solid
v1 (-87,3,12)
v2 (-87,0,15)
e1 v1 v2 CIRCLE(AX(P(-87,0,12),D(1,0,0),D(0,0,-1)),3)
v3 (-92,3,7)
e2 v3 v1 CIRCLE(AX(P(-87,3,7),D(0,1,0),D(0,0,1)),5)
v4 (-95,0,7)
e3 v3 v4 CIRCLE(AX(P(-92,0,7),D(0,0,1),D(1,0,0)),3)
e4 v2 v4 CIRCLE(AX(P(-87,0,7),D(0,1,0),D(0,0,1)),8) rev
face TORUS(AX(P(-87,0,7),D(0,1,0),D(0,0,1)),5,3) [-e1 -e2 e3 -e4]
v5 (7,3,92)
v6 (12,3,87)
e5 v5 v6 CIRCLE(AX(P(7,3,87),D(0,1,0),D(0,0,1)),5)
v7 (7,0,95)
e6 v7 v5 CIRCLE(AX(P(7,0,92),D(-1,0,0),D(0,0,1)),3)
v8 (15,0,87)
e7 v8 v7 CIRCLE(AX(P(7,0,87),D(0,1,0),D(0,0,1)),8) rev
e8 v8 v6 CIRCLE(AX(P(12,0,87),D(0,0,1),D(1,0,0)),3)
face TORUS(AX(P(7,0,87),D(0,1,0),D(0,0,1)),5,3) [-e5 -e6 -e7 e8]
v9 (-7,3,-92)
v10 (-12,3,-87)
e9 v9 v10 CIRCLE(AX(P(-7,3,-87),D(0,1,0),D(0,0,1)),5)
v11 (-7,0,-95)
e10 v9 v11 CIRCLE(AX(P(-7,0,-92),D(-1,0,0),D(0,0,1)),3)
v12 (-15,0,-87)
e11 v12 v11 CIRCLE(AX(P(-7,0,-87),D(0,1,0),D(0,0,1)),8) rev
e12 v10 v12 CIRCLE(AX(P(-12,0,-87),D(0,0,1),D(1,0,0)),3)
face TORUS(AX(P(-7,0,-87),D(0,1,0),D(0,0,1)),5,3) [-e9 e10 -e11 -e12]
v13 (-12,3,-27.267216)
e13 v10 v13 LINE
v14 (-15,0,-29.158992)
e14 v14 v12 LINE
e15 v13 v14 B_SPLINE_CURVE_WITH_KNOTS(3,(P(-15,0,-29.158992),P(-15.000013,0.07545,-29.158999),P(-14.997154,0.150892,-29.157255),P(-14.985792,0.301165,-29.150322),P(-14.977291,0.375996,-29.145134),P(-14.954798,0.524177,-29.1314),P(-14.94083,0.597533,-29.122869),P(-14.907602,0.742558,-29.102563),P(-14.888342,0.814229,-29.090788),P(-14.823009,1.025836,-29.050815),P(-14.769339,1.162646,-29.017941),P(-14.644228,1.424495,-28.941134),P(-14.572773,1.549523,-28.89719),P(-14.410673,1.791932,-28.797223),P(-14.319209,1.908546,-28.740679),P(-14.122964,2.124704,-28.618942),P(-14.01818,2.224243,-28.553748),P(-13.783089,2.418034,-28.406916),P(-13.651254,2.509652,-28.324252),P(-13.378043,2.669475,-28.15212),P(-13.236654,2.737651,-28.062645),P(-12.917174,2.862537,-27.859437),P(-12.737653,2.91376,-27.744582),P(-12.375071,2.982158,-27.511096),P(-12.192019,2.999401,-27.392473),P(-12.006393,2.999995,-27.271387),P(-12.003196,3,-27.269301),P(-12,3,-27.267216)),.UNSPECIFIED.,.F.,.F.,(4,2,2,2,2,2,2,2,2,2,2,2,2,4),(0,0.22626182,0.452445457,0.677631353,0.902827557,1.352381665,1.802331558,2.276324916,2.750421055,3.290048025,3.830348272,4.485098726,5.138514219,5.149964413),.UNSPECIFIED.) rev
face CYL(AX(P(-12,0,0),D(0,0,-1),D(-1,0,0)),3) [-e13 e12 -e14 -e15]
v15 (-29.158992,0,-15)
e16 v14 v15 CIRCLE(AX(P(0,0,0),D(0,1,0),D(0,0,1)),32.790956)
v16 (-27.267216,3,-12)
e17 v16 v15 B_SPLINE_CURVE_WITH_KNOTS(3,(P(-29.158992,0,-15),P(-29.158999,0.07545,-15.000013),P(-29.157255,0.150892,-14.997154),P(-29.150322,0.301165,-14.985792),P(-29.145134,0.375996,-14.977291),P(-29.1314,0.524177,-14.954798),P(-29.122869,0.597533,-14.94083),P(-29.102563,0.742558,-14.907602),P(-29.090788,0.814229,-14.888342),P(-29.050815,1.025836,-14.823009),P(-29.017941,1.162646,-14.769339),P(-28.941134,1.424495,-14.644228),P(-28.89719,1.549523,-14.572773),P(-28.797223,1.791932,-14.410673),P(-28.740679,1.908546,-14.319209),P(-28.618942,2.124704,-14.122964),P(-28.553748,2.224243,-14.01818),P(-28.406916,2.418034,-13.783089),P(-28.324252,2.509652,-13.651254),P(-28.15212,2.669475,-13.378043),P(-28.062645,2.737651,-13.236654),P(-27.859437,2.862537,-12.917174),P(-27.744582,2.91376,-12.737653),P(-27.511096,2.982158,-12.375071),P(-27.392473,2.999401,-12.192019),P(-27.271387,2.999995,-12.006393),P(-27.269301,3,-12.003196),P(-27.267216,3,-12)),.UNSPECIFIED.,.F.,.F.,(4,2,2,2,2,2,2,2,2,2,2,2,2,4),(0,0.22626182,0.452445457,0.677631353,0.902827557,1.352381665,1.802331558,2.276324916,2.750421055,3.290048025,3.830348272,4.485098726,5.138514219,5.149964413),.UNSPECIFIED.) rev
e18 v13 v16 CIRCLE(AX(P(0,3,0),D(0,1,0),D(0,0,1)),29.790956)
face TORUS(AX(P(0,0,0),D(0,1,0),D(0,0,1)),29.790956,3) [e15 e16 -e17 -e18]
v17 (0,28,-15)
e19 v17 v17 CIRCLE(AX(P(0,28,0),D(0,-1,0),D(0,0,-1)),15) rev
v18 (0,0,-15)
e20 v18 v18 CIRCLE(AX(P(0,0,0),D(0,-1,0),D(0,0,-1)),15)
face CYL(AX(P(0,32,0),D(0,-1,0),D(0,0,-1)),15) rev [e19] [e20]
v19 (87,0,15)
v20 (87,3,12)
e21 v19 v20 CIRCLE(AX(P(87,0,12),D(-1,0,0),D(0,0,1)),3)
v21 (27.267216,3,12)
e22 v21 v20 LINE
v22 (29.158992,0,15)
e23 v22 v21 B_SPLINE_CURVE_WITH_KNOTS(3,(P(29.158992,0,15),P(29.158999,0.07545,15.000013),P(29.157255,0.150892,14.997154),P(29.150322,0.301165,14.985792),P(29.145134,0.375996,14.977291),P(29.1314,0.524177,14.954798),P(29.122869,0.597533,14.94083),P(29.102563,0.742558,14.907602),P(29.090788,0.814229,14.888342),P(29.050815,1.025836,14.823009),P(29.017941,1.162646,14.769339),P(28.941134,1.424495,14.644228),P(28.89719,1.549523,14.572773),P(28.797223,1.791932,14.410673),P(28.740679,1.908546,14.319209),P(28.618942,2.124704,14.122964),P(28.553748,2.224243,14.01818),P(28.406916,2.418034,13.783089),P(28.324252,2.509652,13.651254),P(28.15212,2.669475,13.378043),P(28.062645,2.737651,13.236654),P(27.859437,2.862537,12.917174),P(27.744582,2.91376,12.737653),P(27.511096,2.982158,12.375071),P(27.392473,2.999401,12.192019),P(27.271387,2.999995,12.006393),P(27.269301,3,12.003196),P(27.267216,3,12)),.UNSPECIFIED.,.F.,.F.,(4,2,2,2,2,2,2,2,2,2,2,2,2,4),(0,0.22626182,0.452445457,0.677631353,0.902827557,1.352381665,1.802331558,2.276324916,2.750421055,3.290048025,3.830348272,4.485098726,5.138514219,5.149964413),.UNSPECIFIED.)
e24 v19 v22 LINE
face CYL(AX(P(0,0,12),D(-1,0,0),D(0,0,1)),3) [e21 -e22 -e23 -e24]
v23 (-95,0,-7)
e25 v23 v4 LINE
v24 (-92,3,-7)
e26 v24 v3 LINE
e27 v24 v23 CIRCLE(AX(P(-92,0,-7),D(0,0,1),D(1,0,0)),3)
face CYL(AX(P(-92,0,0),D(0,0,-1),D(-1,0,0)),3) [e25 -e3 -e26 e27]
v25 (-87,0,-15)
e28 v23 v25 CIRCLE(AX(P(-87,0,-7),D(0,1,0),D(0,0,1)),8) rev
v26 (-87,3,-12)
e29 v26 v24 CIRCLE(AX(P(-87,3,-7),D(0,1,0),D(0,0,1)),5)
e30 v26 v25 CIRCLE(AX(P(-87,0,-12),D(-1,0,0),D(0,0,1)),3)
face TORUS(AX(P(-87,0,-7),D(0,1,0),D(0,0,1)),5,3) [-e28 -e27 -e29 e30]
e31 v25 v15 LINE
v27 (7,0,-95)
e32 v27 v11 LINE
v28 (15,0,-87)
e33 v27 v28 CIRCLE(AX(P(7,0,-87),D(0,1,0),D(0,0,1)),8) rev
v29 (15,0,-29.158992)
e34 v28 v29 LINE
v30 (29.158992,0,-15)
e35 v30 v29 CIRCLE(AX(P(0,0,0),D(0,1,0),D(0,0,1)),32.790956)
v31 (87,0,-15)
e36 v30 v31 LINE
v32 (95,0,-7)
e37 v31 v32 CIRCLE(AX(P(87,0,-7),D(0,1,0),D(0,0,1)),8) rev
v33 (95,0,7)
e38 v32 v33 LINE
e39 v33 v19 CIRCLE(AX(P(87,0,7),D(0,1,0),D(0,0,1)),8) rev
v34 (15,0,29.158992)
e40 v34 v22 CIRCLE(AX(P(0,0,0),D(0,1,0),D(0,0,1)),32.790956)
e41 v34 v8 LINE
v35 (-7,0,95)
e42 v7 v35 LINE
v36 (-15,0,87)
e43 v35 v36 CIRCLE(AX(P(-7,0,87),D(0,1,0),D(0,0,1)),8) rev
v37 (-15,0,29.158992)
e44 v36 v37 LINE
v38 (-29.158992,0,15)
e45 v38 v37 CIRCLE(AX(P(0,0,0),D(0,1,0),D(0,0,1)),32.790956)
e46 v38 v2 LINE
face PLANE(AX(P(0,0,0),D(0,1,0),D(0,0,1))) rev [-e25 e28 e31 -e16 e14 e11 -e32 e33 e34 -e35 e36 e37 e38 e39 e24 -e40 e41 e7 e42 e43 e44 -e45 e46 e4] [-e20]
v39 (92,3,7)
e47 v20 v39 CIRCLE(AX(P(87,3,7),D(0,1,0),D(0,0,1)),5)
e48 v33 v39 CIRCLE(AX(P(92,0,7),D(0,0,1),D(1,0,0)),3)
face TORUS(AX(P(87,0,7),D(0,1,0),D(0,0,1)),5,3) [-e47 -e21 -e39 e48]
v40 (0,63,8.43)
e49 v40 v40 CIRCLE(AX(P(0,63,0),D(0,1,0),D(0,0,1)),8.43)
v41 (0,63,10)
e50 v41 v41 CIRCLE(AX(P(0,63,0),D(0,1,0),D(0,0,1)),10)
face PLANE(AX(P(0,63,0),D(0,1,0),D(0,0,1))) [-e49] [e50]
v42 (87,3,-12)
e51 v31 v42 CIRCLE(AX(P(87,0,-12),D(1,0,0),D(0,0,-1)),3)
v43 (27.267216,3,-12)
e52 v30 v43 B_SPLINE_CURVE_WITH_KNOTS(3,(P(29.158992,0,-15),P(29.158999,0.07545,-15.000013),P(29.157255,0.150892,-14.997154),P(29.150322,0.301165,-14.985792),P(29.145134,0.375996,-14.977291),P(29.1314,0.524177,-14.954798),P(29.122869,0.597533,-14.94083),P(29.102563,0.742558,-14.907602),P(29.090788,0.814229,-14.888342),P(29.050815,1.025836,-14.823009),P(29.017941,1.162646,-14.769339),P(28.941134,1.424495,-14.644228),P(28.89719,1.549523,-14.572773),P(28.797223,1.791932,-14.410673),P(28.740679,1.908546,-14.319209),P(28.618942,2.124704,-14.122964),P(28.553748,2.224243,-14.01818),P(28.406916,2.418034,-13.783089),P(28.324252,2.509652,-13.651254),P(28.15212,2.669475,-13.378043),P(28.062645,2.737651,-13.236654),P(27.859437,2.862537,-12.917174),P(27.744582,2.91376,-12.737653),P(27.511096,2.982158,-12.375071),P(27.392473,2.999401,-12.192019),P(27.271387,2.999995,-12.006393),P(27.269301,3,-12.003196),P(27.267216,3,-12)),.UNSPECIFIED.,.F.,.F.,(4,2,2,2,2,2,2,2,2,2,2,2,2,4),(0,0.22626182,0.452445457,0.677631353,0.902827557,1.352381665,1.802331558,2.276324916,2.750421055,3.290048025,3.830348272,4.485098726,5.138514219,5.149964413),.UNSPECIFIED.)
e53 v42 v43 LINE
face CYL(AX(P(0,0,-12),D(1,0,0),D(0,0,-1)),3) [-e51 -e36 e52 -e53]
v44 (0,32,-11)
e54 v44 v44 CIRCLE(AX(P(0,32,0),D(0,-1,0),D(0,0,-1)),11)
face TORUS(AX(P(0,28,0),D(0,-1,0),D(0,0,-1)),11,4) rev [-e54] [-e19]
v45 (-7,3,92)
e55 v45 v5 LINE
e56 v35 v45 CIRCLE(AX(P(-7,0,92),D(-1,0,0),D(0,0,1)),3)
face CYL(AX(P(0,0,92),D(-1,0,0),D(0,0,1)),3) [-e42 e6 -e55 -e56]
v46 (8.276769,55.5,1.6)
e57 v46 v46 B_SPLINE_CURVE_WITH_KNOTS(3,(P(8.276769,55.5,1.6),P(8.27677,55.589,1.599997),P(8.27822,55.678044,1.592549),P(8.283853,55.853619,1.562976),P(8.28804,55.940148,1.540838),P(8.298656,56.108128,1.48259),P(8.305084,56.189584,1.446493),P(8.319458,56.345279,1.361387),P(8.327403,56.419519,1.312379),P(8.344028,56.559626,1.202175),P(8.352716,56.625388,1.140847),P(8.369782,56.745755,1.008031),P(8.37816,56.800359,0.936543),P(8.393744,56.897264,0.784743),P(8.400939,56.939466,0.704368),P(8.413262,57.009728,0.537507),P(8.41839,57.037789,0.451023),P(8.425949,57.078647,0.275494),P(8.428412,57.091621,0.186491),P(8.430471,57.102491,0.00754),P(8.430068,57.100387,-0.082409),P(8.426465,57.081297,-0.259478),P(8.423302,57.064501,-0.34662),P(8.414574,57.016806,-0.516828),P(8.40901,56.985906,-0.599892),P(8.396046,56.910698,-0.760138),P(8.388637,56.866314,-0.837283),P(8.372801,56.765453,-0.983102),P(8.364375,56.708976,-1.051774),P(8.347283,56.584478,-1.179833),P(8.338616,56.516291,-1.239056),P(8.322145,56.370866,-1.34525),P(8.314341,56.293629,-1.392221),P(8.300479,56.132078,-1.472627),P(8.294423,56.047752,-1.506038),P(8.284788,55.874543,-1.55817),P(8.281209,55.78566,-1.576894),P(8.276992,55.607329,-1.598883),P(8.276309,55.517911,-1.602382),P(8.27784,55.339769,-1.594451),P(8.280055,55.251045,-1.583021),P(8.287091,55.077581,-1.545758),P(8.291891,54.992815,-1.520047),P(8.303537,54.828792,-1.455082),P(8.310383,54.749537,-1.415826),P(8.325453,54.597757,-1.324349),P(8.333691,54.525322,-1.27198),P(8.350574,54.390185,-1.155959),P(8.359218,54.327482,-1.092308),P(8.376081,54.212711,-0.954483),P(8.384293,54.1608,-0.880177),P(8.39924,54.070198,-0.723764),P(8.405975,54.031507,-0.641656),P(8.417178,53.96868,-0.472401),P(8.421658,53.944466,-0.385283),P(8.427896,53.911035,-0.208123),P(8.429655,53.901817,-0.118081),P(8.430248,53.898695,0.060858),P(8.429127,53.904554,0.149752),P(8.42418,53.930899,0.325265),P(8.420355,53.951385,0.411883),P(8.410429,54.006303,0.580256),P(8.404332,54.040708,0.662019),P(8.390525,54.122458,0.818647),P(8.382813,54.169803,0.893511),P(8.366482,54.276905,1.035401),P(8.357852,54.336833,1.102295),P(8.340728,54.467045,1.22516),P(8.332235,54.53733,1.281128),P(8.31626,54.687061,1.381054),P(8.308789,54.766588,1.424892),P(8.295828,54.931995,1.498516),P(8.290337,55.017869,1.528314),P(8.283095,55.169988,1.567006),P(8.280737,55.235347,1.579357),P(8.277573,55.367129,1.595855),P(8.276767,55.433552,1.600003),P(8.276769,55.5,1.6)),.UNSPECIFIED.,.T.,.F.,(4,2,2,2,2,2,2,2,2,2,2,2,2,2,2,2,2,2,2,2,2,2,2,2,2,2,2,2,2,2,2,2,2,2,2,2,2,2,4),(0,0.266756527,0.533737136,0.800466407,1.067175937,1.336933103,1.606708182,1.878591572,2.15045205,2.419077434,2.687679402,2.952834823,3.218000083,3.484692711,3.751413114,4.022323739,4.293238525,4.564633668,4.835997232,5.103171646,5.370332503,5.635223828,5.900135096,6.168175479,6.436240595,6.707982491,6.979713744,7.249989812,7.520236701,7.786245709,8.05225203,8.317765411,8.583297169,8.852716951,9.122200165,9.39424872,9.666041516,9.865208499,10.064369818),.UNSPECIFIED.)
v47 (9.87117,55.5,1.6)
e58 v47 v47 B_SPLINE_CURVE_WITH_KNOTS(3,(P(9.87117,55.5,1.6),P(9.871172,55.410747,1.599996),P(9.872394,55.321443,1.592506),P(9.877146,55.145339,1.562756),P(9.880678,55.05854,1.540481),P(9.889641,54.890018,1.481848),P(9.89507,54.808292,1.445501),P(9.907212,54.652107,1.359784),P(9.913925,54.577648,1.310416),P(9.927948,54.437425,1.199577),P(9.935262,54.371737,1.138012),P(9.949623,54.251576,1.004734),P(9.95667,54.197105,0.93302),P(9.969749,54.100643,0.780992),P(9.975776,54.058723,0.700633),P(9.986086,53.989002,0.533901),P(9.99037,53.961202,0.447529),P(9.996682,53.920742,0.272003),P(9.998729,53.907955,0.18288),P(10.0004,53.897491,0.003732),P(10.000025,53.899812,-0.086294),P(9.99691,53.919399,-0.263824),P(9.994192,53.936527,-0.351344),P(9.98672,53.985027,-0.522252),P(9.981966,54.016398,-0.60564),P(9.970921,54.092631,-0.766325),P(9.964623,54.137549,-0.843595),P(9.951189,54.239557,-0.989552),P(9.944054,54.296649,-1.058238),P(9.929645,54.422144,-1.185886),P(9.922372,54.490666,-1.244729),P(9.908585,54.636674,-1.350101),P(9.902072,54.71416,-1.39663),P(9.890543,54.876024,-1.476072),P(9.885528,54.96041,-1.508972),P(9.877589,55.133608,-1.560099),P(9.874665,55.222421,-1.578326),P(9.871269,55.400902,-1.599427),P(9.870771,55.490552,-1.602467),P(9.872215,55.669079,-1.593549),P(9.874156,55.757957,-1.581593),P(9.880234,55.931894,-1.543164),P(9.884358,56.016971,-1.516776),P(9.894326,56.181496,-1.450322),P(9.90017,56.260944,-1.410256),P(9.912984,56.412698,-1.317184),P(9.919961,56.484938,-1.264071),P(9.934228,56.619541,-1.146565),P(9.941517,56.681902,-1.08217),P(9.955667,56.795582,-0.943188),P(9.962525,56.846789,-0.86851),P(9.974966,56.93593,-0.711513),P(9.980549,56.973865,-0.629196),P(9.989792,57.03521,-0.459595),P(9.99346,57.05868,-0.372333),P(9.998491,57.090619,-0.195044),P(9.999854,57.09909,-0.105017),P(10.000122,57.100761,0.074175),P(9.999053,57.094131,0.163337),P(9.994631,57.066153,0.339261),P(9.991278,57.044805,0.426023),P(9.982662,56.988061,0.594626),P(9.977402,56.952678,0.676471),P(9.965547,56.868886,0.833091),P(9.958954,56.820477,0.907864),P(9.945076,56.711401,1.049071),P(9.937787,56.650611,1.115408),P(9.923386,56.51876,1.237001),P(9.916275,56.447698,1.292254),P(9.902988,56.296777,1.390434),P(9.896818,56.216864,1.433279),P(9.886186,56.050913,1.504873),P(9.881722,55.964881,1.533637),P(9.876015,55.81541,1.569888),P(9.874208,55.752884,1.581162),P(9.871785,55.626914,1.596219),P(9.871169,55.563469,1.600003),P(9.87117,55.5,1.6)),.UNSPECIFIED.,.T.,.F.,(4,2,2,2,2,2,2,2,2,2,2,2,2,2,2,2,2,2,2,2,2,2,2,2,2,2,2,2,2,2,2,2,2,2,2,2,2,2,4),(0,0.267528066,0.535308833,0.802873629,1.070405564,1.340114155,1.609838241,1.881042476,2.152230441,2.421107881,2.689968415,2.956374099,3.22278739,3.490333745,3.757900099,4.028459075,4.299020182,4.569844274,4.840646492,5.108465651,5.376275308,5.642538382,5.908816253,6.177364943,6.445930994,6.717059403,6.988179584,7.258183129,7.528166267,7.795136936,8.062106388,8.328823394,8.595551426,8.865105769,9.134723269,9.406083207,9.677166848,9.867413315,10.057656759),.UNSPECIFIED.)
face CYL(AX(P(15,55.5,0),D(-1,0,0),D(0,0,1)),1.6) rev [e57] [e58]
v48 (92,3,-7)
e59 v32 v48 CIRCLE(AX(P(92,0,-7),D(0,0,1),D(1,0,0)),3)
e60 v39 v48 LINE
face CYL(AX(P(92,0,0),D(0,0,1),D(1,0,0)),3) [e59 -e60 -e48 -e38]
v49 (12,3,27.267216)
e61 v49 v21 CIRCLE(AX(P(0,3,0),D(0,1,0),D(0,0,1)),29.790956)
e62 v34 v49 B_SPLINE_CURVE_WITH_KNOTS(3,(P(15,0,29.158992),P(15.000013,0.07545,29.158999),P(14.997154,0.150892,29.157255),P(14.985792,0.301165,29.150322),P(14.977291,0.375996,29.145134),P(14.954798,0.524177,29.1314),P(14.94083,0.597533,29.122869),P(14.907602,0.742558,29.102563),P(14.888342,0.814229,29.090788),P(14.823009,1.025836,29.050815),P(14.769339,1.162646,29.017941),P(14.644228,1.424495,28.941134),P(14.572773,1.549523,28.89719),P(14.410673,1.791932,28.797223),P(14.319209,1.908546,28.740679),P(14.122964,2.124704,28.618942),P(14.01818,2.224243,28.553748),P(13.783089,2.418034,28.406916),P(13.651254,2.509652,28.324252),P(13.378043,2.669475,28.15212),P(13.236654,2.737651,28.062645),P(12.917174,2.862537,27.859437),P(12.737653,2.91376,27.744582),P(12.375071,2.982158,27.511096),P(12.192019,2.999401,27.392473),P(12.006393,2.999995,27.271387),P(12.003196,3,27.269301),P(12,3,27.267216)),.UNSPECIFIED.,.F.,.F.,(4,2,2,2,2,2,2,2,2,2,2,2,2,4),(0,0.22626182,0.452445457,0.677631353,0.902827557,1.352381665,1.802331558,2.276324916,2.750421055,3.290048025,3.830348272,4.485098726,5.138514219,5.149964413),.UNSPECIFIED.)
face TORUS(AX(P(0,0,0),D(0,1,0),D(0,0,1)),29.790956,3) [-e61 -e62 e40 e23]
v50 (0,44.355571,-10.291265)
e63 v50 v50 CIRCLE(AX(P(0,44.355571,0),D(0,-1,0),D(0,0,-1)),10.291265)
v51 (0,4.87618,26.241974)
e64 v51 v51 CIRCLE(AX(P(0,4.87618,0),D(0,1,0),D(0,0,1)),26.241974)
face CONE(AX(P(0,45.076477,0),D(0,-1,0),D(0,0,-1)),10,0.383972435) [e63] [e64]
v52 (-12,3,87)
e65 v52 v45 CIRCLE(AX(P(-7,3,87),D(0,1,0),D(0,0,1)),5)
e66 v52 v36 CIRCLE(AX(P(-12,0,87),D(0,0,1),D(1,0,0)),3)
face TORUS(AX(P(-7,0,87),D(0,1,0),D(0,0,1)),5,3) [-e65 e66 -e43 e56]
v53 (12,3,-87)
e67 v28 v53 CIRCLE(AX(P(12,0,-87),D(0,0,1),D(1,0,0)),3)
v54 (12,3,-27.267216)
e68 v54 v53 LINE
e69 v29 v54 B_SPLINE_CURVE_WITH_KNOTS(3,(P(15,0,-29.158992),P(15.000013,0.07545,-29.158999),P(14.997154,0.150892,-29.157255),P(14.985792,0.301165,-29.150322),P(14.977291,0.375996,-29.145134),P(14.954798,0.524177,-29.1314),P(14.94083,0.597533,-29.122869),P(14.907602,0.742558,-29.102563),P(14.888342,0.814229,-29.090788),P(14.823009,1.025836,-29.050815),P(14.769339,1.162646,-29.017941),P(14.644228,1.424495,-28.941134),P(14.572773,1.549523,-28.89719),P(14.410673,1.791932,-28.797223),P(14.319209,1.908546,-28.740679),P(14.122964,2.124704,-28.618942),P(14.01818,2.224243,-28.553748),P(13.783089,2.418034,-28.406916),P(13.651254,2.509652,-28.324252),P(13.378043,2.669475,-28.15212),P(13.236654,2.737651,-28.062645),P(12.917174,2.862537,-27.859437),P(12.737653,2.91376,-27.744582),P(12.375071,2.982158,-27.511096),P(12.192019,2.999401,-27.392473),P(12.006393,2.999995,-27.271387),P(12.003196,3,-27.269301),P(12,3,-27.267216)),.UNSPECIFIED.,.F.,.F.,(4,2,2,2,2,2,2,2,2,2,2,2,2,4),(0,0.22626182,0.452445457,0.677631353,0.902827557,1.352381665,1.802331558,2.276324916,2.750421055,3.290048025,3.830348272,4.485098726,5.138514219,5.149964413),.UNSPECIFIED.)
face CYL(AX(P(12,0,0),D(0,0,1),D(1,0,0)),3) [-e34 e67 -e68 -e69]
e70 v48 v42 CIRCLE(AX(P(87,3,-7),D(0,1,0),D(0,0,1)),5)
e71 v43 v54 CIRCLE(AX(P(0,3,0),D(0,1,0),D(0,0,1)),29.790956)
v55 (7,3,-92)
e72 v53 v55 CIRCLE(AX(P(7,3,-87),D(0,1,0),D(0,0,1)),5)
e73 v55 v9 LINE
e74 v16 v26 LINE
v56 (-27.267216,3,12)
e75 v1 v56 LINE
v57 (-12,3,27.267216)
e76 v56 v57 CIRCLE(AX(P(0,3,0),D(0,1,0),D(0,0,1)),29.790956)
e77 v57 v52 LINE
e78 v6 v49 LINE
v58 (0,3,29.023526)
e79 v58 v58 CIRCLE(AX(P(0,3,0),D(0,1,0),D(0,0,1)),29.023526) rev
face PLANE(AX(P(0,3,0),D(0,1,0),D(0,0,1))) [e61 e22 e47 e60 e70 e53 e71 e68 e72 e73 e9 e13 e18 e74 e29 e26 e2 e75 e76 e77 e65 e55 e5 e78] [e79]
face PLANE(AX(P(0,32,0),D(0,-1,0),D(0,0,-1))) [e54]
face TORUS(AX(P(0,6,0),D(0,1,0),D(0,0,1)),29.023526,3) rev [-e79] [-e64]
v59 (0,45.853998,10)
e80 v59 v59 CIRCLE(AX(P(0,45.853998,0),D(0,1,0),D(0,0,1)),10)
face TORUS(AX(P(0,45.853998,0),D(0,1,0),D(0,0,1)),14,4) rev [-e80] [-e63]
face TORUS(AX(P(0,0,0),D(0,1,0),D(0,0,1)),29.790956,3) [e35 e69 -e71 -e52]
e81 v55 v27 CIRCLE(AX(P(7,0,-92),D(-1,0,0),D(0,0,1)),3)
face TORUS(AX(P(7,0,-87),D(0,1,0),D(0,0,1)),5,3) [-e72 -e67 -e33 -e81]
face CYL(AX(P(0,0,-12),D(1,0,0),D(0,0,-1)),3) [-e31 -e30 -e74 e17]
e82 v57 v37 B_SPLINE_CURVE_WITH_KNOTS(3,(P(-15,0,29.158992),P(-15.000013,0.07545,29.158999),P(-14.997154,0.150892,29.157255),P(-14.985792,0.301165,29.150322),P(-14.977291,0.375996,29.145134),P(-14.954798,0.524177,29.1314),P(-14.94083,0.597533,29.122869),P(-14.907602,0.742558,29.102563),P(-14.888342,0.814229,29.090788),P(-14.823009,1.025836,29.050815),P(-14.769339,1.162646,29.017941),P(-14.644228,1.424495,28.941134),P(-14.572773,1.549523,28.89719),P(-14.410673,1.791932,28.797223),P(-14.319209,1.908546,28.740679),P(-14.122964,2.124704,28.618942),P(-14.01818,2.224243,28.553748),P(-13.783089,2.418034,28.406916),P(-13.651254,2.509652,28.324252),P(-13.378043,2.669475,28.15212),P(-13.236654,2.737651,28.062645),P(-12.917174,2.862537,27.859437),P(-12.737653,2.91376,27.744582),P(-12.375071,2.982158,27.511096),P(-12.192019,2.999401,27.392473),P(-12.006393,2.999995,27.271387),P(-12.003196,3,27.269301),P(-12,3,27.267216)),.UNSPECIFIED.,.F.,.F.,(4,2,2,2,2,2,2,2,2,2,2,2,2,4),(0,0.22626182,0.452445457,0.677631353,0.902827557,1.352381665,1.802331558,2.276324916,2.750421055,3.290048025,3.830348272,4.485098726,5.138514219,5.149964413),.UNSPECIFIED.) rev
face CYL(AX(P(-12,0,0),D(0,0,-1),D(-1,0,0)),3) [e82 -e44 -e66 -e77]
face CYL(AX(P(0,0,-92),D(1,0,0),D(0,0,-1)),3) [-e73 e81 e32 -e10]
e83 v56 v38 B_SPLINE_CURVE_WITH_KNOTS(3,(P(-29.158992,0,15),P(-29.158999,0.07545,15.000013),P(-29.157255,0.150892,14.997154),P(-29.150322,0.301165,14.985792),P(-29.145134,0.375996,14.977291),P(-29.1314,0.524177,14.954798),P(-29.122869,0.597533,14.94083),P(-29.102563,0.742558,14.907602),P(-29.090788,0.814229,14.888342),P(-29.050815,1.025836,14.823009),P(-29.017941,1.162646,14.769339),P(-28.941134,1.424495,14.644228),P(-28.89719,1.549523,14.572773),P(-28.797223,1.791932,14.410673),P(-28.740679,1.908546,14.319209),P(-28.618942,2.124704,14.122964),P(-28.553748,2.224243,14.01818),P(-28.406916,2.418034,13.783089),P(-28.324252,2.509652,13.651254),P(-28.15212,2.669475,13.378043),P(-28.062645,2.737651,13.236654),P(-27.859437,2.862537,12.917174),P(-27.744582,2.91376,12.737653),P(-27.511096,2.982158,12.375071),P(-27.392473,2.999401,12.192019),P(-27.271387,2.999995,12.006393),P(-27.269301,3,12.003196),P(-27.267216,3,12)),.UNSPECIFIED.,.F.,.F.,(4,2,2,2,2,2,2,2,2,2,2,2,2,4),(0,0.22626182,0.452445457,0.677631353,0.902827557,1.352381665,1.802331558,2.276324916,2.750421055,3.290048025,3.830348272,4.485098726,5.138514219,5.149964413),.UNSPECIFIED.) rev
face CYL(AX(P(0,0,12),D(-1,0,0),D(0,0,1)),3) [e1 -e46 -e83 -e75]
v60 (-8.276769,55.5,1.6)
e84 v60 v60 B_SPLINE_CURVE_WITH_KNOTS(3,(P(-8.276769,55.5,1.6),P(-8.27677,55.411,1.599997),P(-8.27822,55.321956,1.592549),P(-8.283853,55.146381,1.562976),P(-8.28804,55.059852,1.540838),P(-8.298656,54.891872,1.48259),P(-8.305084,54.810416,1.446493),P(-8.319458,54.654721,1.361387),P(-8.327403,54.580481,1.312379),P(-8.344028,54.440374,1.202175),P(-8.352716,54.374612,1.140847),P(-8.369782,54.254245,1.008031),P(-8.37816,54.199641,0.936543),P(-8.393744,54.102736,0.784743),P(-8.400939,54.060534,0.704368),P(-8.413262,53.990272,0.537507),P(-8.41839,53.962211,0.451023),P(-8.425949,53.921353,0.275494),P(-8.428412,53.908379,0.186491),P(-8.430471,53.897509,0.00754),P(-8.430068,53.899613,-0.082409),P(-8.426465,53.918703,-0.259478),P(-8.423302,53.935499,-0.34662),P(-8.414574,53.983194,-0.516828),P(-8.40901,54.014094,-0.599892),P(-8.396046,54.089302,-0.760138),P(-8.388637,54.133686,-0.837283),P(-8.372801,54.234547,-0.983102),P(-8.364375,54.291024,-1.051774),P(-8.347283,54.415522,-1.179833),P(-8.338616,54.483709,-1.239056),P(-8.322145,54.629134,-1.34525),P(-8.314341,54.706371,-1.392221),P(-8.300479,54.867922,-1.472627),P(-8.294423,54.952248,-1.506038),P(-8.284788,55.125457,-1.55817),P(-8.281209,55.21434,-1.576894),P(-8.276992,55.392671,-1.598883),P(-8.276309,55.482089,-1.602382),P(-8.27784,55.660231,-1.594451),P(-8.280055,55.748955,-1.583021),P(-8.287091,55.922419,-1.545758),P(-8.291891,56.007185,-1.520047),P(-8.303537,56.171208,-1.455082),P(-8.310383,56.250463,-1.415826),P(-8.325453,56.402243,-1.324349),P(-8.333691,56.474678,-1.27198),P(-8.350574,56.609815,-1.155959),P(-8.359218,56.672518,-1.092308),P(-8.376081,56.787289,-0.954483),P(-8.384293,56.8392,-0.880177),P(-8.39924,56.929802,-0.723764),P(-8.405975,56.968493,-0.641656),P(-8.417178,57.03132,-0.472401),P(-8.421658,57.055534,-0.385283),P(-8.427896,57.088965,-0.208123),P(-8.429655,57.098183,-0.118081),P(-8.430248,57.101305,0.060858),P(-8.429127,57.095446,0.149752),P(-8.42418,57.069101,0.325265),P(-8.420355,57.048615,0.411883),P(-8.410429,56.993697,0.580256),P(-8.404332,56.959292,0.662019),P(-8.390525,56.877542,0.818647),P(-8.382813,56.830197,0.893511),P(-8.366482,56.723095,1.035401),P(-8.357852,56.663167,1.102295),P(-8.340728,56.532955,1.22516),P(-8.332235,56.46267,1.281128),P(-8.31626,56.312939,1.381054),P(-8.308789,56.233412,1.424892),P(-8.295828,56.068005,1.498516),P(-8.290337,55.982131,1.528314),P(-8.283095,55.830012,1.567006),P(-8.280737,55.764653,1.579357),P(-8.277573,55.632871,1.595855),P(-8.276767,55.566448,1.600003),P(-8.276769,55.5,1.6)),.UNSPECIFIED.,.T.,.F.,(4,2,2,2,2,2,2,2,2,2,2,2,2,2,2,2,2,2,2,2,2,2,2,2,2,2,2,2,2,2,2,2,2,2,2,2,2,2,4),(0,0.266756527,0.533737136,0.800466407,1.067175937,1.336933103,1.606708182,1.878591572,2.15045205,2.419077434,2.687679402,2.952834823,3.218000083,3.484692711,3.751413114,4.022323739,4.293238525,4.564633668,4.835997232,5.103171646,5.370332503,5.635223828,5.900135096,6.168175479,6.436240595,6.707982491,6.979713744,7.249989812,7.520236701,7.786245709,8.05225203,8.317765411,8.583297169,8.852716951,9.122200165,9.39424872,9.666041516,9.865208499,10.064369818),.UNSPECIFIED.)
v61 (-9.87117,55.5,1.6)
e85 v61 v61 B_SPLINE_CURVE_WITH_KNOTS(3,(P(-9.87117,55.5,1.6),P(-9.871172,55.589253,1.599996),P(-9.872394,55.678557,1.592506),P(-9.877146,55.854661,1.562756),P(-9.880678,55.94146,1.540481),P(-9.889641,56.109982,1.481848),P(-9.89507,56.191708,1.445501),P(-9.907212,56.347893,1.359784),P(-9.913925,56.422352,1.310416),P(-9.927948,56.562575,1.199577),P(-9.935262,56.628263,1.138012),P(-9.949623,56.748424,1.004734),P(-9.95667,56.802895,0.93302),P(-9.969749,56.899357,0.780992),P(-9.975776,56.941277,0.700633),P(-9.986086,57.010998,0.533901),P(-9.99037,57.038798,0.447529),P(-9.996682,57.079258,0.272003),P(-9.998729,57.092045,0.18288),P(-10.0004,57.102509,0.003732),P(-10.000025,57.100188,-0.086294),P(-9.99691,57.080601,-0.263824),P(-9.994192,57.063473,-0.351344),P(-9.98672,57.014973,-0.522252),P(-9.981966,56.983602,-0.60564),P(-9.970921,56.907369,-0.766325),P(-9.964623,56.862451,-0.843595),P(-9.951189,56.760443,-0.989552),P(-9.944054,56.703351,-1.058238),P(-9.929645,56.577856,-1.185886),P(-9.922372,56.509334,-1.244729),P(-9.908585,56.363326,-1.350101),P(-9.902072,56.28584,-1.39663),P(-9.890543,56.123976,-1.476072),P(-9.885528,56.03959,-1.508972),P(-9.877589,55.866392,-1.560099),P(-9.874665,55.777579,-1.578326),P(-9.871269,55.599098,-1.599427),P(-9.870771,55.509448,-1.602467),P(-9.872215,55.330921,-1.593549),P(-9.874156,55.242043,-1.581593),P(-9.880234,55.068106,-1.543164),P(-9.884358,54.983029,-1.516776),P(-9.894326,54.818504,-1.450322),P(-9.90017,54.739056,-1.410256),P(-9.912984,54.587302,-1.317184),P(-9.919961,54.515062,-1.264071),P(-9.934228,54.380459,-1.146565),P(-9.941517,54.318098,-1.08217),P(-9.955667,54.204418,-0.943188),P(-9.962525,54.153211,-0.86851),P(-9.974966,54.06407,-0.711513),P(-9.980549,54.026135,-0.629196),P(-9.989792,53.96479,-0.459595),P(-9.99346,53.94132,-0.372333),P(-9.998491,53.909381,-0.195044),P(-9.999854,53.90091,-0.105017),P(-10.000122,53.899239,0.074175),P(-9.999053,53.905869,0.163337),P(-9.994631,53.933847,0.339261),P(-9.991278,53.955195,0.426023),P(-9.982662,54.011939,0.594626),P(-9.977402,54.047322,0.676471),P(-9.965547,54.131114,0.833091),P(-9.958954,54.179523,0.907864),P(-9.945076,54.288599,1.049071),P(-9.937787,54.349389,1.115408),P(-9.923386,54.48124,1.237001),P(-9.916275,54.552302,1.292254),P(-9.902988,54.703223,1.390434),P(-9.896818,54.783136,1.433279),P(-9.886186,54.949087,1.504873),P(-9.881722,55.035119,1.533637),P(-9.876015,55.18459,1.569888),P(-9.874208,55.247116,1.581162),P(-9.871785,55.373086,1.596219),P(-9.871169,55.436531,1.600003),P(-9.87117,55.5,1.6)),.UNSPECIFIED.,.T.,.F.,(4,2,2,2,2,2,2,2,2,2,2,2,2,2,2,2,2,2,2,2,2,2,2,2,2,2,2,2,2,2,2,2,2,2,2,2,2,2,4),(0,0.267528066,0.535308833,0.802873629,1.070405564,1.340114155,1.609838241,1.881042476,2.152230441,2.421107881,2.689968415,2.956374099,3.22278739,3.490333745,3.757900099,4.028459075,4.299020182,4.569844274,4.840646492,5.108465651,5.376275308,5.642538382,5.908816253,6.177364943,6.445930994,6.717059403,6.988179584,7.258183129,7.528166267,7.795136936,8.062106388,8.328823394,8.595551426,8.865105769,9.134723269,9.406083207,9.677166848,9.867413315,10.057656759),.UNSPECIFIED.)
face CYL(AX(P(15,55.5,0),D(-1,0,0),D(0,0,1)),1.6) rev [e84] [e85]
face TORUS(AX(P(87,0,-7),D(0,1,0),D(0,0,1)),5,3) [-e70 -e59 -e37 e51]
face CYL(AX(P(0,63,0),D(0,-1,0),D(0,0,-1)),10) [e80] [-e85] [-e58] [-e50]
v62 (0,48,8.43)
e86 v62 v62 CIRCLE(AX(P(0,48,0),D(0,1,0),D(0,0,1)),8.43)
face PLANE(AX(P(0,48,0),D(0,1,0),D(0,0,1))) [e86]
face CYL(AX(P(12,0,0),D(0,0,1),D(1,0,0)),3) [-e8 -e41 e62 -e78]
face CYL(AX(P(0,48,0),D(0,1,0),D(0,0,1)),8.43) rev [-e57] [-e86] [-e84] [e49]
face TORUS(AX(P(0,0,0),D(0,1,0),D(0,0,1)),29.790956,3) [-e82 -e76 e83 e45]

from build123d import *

# Parameters (mm, degrees)
BOSS_EXTRUDE1_DEPTH     = 3
FILLET4_R               = 8
FILLET5_R               = 3
SKETCH4_R               = 10
BOSS_EXTRUDE4_DEPTH     = 60
CHAMFER2_SIZE           = 17
CHAMFER2_SIZE2          = 42.076476508
FILLET7_R               = 4
SKETCH5_R               = 15
CUT_EXTRUDE1_DEPTH      = 32
FILLET8_R               = 3
SKETCH6_R               = 8.43
CUT_EXTRUDE2_DEPTH      = 15
FILLET9_R               = 4
CUT_EXTRUDE3_DEPTH      = 15
CUT_EXTRUDE3_DEPTH_BACK = 15


with BuildPart() as part:
    # Sketch1 → Boss-Extrude1 (new body)
    with BuildSketch(Plane(origin=(0, 0, 0), x_dir=(1, 0, 0), z_dir=(0, 1, 0))):
        with BuildLine():
            ThreePointArc((29.158991571, 15), (31.870032918, 7.716721534), (32.790955909, 0))
            Line((32.790955909, 0), (95, 0))
            Line((95, 0), (95, 15))
            Line((95, 15), (29.158991571, 15))
        make_face()
        with BuildLine():
            Line((95, 0), (32.790955909, 0))
            ThreePointArc((32.790955909, 0), (31.870032918, -7.716721534), (29.158991571, -15))
            Line((29.158991571, -15), (95, -15))
            Line((95, -15), (95, 0))
        make_face()
        with BuildLine():
            ThreePointArc((15, 29.158991571), (7.716721534, 31.870032918), (0, 32.790955909))
            Line((0, 32.790955909), (0, 0))
            Line((0, 0), (32.790955909, 0))
            ThreePointArc((32.790955909, 0), (31.870032918, 7.716721534), (29.158991571, 15))
            ThreePointArc((29.158991571, 15), (23.186707285, 23.186707285), (15, 29.158991571))
        make_face()
        with BuildLine():
            Line((0, 0), (0, 32.790955909))
            ThreePointArc((0, 32.790955909), (-7.716721534, 31.870032918), (-15, 29.158991571))
            ThreePointArc((-15, 29.158991571), (-23.186707285, 23.186707285), (-29.158991571, 15))
            ThreePointArc((-29.158991571, 15), (-31.870032918, 7.716721534), (-32.790955909, 0))
            Line((-32.790955909, 0), (0, 0))
        make_face()
        with BuildLine():
            Line((32.790955909, 0), (0, 0))
            Line((0, 0), (0, -32.790955909))
            ThreePointArc((0, -32.790955909), (7.716721534, -31.870032918), (15, -29.158991571))
            ThreePointArc((15, -29.158991571), (23.186707285, -23.186707285), (29.158991571, -15))
            ThreePointArc((29.158991571, -15), (31.870032918, -7.716721534), (32.790955909, 0))
        make_face()
        with BuildLine():
            Line((0, -32.790955909), (0, 0))
            Line((0, 0), (-32.790955909, 0))
            ThreePointArc((-32.790955909, 0), (-31.870032918, -7.716721534), (-29.158991571, -15))
            ThreePointArc((-29.158991571, -15), (-23.186707285, -23.186707285), (-15, -29.158991571))
            ThreePointArc((-15, -29.158991571), (-7.716721534, -31.870032918), (0, -32.790955909))
        make_face()
        with BuildLine():
            ThreePointArc((15, 29.158991571), (7.716721534, 31.870032918), (0, 32.790955909))
            Line((0, 32.790955909), (0, 0))
            Line((0, 0), (32.790955909, 0))
            ThreePointArc((32.790955909, 0), (31.870032918, 7.716721534), (29.158991571, 15))
            ThreePointArc((29.158991571, 15), (23.186707285, 23.186707285), (15, 29.158991571))
        make_face()
        with BuildLine():
            Line((0, 0), (0, 32.790955909))
            ThreePointArc((0, 32.790955909), (-7.716721534, 31.870032918), (-15, 29.158991571))
            ThreePointArc((-15, 29.158991571), (-23.186707285, 23.186707285), (-29.158991571, 15))
            ThreePointArc((-29.158991571, 15), (-31.870032918, 7.716721534), (-32.790955909, 0))
            Line((-32.790955909, 0), (0, 0))
        make_face()
        with BuildLine():
            Line((32.790955909, 0), (0, 0))
            Line((0, 0), (0, -32.790955909))
            ThreePointArc((0, -32.790955909), (7.716721534, -31.870032918), (15, -29.158991571))
            ThreePointArc((15, -29.158991571), (23.186707285, -23.186707285), (29.158991571, -15))
            ThreePointArc((29.158991571, -15), (31.870032918, -7.716721534), (32.790955909, 0))
        make_face()
        with BuildLine():
            Line((0, -32.790955909), (0, 0))
            Line((0, 0), (-32.790955909, 0))
            ThreePointArc((-32.790955909, 0), (-31.870032918, -7.716721534), (-29.158991571, -15))
            ThreePointArc((-29.158991571, -15), (-23.186707285, -23.186707285), (-15, -29.158991571))
            ThreePointArc((-15, -29.158991571), (-7.716721534, -31.870032918), (0, -32.790955909))
        make_face()
        with BuildLine():
            ThreePointArc((15, 29.158991571), (7.716721534, 31.870032918), (0, 32.790955909))
            Line((0, 32.790955909), (0, 0))
            Line((0, 0), (32.790955909, 0))
            ThreePointArc((32.790955909, 0), (31.870032918, 7.716721534), (29.158991571, 15))
            ThreePointArc((29.158991571, 15), (23.186707285, 23.186707285), (15, 29.158991571))
        make_face()
        with BuildLine():
            Line((0, 0), (0, 32.790955909))
            ThreePointArc((0, 32.790955909), (-7.716721534, 31.870032918), (-15, 29.158991571))
            ThreePointArc((-15, 29.158991571), (-23.186707285, 23.186707285), (-29.158991571, 15))
            ThreePointArc((-29.158991571, 15), (-31.870032918, 7.716721534), (-32.790955909, 0))
            Line((-32.790955909, 0), (0, 0))
        make_face()
        with BuildLine():
            Line((32.790955909, 0), (0, 0))
            Line((0, 0), (0, -32.790955909))
            ThreePointArc((0, -32.790955909), (7.716721534, -31.870032918), (15, -29.158991571))
            ThreePointArc((15, -29.158991571), (23.186707285, -23.186707285), (29.158991571, -15))
            ThreePointArc((29.158991571, -15), (31.870032918, -7.716721534), (32.790955909, 0))
        make_face()
        with BuildLine():
            Line((0, -32.790955909), (0, 0))
            Line((0, 0), (-32.790955909, 0))
            ThreePointArc((-32.790955909, 0), (-31.870032918, -7.716721534), (-29.158991571, -15))
            ThreePointArc((-29.158991571, -15), (-23.186707285, -23.186707285), (-15, -29.158991571))
            ThreePointArc((-15, -29.158991571), (-7.716721534, -31.870032918), (0, -32.790955909))
        make_face()
        with BuildLine():
            ThreePointArc((15, 29.158991571), (7.716721534, 31.870032918), (0, 32.790955909))
            Line((0, 32.790955909), (0, 0))
            Line((0, 0), (32.790955909, 0))
            ThreePointArc((32.790955909, 0), (31.870032918, 7.716721534), (29.158991571, 15))
            ThreePointArc((29.158991571, 15), (23.186707285, 23.186707285), (15, 29.158991571))
        make_face()
        with BuildLine():
            Line((0, 0), (0, 32.790955909))
            ThreePointArc((0, 32.790955909), (-7.716721534, 31.870032918), (-15, 29.158991571))
            ThreePointArc((-15, 29.158991571), (-23.186707285, 23.186707285), (-29.158991571, 15))
            ThreePointArc((-29.158991571, 15), (-31.870032918, 7.716721534), (-32.790955909, 0))
            Line((-32.790955909, 0), (0, 0))
        make_face()
        with BuildLine():
            Line((32.790955909, 0), (0, 0))
            Line((0, 0), (0, -32.790955909))
            ThreePointArc((0, -32.790955909), (7.716721534, -31.870032918), (15, -29.158991571))
            ThreePointArc((15, -29.158991571), (23.186707285, -23.186707285), (29.158991571, -15))
            ThreePointArc((29.158991571, -15), (31.870032918, -7.716721534), (32.790955909, 0))
        make_face()
        with BuildLine():
            Line((0, -32.790955909), (0, 0))
            Line((0, 0), (-32.790955909, 0))
            ThreePointArc((-32.790955909, 0), (-31.870032918, -7.716721534), (-29.158991571, -15))
            ThreePointArc((-29.158991571, -15), (-23.186707285, -23.186707285), (-15, -29.158991571))
            ThreePointArc((-15, -29.158991571), (-7.716721534, -31.870032918), (0, -32.790955909))
        make_face()
        with BuildLine():
            Line((0, 32.790955909), (0, 95))
            Line((0, 95), (-15, 95))
            Line((-15, 95), (-15, 29.158991571))
            ThreePointArc((-15, 29.158991571), (-7.716721534, 31.870032918), (0, 32.790955909))
        make_face()
        with BuildLine():
            Line((15, 95), (0, 95))
            Line((0, 95), (0, 32.790955909))
            ThreePointArc((0, 32.790955909), (7.716721534, 31.870032918), (15, 29.158991571))
            Line((15, 29.158991571), (15, 95))
        make_face()
        with BuildLine():
            Line((-95, 0), (-32.790955909, 0))
            ThreePointArc((-32.790955909, 0), (-31.870032918, 7.716721534), (-29.158991571, 15))
            Line((-29.158991571, 15), (-95, 15))
            Line((-95, 15), (-95, 0))
        make_face()
        with BuildLine():
            ThreePointArc((-29.158991571, -15), (-31.870032918, -7.716721534), (-32.790955909, 0))
            Line((-32.790955909, 0), (-95, 0))
            Line((-95, 0), (-95, -15))
            Line((-95, -15), (-29.158991571, -15))
        make_face()
        with BuildLine():
            Line((0, -95), (0, -32.790955909))
            ThreePointArc((0, -32.790955909), (-7.716721534, -31.870032918), (-15, -29.158991571))
            Line((-15, -29.158991571), (-15, -95))
            Line((-15, -95), (0, -95))
        make_face()
        with BuildLine():
            ThreePointArc((15, -29.158991571), (7.716721534, -31.870032918), (0, -32.790955909))
            Line((0, -32.790955909), (0, -95))
            Line((0, -95), (15, -95))
            Line((15, -95), (15, -29.158991571))
        make_face()
    extrude(amount=BOSS_EXTRUDE1_DEPTH)

    # Fillet4
    fillet4_edges = [part.edges().sort_by_distance(p)[0] for p in [
        (95, 1.5, -15),
        (95, 1.5, 15),
        (15, 1.5, 95),
        (-15, 1.5, 95),
        (-95, 1.5, 15),
        (-95, 1.5, -15),
        (-15, 1.5, -95),
        (15, 1.5, -95),
    ]]
    fillet(fillet4_edges, radius=FILLET4_R)

    # Fillet5
    fillet5_edges = [part.edges().sort_by_distance(p)[0] for p in [
        (-12.656854249, 3, 92.656854249),
        (-15, 3, 58.079495785),
        (-23.186707285, 3, 23.186707285),
        (-58.079495785, 3, 15),
        (-92.656854249, 3, 12.656854249),
        (-95, 3, 0),
        (-92.656854249, 3, -12.656854249),
        (-58.079495785, 3, -15),
        (-23.186707285, 3, -23.186707285),
        (-15, 3, -58.079495785),
        (-12.656854249, 3, -92.656854249),
        (0, 3, -95),
        (12.656854249, 3, -92.656854249),
        (15, 3, -58.079495785),
        (23.186707285, 3, -23.186707285),
        (58.079495785, 3, -15),
        (92.656854249, 3, -12.656854249),
        (95, 3, 0),
        (92.656854249, 3, 12.656854249),
        (58.079495785, 3, 15),
        (23.186707285, 3, 23.186707285),
        (15, 3, 58.079495785),
        (12.656854249, 3, 92.656854249),
        (0, 3, 95),
    ]]
    fillet(fillet5_edges, radius=FILLET5_R - 0.0001)  # a hair under: the kernel refuses the full size

    # Sketch4 → Boss-Extrude4 (add)
    with BuildSketch(Plane(origin=(0, 3, 0), x_dir=(1, 0, 0), z_dir=(0, 1, 0))):
        with Locations(Location((0, 0, 0), (0, 0, 270))):
            Circle(SKETCH4_R)
    extrude(amount=BOSS_EXTRUDE4_DEPTH)

    # Chamfer2
    chamfer2_edges = [part.edges().sort_by_distance(p)[0] for p in [
        (0, 3, -10),
    ]]
    chamfer2_side = [part.faces().sort_by_distance(p)[0] for p in [
        (9.397944217, 3, 57.133640491),
    ]]
    chamfer(chamfer2_edges, length=CHAMFER2_SIZE, length2=CHAMFER2_SIZE2, reference=chamfer2_side[0])

    # Fillet7
    fillet7_edges = [part.edges().sort_by_distance(p)[0] for p in [
        (0, 45.076476508, -10),
    ]]
    fillet(fillet7_edges, radius=FILLET7_R)

    # Sketch5 → Cut-Extrude1 (cut)
    with BuildSketch(Plane.XZ):
        with Locations(Location((0, 0, 0), (0, 0, 270))):
            Circle(SKETCH5_R)
    extrude(amount=-CUT_EXTRUDE1_DEPTH, mode=Mode.SUBTRACT)

    # Fillet8
    fillet8_edges = [part.edges().sort_by_distance(p)[0] for p in [
        (0, 3, -27),
    ]]
    fillet(fillet8_edges, radius=FILLET8_R)

    # Sketch6 → Cut-Extrude2 (cut)
    with BuildSketch(Plane(origin=(0, 63, 0), x_dir=(1, 0, 0), z_dir=(0, 1, 0))):
        with Locations(Location((0, 0, 0), (0, 0, 270))):
            Circle(SKETCH6_R)
    extrude(amount=-CUT_EXTRUDE2_DEPTH, mode=Mode.SUBTRACT)

    # Fillet9
    fillet9_edges = [part.edges().sort_by_distance(p)[0] for p in [
        (0, 32, 15),
    ]]
    fillet(fillet9_edges, radius=FILLET9_R)

    # Sketch8 → Cut-Extrude3 (cut, two sides: drawn at the far end of the back side and taken through both)
    with BuildSketch(Plane(origin=(0, 0, 0), x_dir=(0, 0, -1), z_dir=(1, 0, 0)).offset(-CUT_EXTRUDE3_DEPTH_BACK)):
        with BuildLine():
            Line((0, 55.5), (0, 57.1))
            ThreePointArc((0, 57.1), (-1.6, 55.5), (0, 53.9))
            Line((0, 53.9), (0, 55.5))
        make_face()
        with BuildLine():
            ThreePointArc((1.6, 55.5), (1.13137085, 56.63137085), (0, 57.1))
            Line((0, 57.1), (0, 55.5))
            Line((0, 55.5), (1.6, 55.5))
        make_face()
        with BuildLine():
            Line((1.6, 55.5), (0, 55.5))
            Line((0, 55.5), (0, 53.9))
            ThreePointArc((0, 53.9), (1.13137085, 54.36862915), (1.6, 55.5))
        make_face()
        with BuildLine():
            ThreePointArc((1.6, 55.5), (1.13137085, 56.63137085), (0, 57.1))
            Line((0, 57.1), (0, 55.5))
            Line((0, 55.5), (1.6, 55.5))
        make_face()
        with BuildLine():
            Line((1.6, 55.5), (0, 55.5))
            Line((0, 55.5), (0, 53.9))
            ThreePointArc((0, 53.9), (1.13137085, 54.36862915), (1.6, 55.5))
        make_face()
    extrude(amount=CUT_EXTRUDE3_DEPTH + CUT_EXTRUDE3_DEPTH_BACK, mode=Mode.SUBTRACT)


solid = part.part
